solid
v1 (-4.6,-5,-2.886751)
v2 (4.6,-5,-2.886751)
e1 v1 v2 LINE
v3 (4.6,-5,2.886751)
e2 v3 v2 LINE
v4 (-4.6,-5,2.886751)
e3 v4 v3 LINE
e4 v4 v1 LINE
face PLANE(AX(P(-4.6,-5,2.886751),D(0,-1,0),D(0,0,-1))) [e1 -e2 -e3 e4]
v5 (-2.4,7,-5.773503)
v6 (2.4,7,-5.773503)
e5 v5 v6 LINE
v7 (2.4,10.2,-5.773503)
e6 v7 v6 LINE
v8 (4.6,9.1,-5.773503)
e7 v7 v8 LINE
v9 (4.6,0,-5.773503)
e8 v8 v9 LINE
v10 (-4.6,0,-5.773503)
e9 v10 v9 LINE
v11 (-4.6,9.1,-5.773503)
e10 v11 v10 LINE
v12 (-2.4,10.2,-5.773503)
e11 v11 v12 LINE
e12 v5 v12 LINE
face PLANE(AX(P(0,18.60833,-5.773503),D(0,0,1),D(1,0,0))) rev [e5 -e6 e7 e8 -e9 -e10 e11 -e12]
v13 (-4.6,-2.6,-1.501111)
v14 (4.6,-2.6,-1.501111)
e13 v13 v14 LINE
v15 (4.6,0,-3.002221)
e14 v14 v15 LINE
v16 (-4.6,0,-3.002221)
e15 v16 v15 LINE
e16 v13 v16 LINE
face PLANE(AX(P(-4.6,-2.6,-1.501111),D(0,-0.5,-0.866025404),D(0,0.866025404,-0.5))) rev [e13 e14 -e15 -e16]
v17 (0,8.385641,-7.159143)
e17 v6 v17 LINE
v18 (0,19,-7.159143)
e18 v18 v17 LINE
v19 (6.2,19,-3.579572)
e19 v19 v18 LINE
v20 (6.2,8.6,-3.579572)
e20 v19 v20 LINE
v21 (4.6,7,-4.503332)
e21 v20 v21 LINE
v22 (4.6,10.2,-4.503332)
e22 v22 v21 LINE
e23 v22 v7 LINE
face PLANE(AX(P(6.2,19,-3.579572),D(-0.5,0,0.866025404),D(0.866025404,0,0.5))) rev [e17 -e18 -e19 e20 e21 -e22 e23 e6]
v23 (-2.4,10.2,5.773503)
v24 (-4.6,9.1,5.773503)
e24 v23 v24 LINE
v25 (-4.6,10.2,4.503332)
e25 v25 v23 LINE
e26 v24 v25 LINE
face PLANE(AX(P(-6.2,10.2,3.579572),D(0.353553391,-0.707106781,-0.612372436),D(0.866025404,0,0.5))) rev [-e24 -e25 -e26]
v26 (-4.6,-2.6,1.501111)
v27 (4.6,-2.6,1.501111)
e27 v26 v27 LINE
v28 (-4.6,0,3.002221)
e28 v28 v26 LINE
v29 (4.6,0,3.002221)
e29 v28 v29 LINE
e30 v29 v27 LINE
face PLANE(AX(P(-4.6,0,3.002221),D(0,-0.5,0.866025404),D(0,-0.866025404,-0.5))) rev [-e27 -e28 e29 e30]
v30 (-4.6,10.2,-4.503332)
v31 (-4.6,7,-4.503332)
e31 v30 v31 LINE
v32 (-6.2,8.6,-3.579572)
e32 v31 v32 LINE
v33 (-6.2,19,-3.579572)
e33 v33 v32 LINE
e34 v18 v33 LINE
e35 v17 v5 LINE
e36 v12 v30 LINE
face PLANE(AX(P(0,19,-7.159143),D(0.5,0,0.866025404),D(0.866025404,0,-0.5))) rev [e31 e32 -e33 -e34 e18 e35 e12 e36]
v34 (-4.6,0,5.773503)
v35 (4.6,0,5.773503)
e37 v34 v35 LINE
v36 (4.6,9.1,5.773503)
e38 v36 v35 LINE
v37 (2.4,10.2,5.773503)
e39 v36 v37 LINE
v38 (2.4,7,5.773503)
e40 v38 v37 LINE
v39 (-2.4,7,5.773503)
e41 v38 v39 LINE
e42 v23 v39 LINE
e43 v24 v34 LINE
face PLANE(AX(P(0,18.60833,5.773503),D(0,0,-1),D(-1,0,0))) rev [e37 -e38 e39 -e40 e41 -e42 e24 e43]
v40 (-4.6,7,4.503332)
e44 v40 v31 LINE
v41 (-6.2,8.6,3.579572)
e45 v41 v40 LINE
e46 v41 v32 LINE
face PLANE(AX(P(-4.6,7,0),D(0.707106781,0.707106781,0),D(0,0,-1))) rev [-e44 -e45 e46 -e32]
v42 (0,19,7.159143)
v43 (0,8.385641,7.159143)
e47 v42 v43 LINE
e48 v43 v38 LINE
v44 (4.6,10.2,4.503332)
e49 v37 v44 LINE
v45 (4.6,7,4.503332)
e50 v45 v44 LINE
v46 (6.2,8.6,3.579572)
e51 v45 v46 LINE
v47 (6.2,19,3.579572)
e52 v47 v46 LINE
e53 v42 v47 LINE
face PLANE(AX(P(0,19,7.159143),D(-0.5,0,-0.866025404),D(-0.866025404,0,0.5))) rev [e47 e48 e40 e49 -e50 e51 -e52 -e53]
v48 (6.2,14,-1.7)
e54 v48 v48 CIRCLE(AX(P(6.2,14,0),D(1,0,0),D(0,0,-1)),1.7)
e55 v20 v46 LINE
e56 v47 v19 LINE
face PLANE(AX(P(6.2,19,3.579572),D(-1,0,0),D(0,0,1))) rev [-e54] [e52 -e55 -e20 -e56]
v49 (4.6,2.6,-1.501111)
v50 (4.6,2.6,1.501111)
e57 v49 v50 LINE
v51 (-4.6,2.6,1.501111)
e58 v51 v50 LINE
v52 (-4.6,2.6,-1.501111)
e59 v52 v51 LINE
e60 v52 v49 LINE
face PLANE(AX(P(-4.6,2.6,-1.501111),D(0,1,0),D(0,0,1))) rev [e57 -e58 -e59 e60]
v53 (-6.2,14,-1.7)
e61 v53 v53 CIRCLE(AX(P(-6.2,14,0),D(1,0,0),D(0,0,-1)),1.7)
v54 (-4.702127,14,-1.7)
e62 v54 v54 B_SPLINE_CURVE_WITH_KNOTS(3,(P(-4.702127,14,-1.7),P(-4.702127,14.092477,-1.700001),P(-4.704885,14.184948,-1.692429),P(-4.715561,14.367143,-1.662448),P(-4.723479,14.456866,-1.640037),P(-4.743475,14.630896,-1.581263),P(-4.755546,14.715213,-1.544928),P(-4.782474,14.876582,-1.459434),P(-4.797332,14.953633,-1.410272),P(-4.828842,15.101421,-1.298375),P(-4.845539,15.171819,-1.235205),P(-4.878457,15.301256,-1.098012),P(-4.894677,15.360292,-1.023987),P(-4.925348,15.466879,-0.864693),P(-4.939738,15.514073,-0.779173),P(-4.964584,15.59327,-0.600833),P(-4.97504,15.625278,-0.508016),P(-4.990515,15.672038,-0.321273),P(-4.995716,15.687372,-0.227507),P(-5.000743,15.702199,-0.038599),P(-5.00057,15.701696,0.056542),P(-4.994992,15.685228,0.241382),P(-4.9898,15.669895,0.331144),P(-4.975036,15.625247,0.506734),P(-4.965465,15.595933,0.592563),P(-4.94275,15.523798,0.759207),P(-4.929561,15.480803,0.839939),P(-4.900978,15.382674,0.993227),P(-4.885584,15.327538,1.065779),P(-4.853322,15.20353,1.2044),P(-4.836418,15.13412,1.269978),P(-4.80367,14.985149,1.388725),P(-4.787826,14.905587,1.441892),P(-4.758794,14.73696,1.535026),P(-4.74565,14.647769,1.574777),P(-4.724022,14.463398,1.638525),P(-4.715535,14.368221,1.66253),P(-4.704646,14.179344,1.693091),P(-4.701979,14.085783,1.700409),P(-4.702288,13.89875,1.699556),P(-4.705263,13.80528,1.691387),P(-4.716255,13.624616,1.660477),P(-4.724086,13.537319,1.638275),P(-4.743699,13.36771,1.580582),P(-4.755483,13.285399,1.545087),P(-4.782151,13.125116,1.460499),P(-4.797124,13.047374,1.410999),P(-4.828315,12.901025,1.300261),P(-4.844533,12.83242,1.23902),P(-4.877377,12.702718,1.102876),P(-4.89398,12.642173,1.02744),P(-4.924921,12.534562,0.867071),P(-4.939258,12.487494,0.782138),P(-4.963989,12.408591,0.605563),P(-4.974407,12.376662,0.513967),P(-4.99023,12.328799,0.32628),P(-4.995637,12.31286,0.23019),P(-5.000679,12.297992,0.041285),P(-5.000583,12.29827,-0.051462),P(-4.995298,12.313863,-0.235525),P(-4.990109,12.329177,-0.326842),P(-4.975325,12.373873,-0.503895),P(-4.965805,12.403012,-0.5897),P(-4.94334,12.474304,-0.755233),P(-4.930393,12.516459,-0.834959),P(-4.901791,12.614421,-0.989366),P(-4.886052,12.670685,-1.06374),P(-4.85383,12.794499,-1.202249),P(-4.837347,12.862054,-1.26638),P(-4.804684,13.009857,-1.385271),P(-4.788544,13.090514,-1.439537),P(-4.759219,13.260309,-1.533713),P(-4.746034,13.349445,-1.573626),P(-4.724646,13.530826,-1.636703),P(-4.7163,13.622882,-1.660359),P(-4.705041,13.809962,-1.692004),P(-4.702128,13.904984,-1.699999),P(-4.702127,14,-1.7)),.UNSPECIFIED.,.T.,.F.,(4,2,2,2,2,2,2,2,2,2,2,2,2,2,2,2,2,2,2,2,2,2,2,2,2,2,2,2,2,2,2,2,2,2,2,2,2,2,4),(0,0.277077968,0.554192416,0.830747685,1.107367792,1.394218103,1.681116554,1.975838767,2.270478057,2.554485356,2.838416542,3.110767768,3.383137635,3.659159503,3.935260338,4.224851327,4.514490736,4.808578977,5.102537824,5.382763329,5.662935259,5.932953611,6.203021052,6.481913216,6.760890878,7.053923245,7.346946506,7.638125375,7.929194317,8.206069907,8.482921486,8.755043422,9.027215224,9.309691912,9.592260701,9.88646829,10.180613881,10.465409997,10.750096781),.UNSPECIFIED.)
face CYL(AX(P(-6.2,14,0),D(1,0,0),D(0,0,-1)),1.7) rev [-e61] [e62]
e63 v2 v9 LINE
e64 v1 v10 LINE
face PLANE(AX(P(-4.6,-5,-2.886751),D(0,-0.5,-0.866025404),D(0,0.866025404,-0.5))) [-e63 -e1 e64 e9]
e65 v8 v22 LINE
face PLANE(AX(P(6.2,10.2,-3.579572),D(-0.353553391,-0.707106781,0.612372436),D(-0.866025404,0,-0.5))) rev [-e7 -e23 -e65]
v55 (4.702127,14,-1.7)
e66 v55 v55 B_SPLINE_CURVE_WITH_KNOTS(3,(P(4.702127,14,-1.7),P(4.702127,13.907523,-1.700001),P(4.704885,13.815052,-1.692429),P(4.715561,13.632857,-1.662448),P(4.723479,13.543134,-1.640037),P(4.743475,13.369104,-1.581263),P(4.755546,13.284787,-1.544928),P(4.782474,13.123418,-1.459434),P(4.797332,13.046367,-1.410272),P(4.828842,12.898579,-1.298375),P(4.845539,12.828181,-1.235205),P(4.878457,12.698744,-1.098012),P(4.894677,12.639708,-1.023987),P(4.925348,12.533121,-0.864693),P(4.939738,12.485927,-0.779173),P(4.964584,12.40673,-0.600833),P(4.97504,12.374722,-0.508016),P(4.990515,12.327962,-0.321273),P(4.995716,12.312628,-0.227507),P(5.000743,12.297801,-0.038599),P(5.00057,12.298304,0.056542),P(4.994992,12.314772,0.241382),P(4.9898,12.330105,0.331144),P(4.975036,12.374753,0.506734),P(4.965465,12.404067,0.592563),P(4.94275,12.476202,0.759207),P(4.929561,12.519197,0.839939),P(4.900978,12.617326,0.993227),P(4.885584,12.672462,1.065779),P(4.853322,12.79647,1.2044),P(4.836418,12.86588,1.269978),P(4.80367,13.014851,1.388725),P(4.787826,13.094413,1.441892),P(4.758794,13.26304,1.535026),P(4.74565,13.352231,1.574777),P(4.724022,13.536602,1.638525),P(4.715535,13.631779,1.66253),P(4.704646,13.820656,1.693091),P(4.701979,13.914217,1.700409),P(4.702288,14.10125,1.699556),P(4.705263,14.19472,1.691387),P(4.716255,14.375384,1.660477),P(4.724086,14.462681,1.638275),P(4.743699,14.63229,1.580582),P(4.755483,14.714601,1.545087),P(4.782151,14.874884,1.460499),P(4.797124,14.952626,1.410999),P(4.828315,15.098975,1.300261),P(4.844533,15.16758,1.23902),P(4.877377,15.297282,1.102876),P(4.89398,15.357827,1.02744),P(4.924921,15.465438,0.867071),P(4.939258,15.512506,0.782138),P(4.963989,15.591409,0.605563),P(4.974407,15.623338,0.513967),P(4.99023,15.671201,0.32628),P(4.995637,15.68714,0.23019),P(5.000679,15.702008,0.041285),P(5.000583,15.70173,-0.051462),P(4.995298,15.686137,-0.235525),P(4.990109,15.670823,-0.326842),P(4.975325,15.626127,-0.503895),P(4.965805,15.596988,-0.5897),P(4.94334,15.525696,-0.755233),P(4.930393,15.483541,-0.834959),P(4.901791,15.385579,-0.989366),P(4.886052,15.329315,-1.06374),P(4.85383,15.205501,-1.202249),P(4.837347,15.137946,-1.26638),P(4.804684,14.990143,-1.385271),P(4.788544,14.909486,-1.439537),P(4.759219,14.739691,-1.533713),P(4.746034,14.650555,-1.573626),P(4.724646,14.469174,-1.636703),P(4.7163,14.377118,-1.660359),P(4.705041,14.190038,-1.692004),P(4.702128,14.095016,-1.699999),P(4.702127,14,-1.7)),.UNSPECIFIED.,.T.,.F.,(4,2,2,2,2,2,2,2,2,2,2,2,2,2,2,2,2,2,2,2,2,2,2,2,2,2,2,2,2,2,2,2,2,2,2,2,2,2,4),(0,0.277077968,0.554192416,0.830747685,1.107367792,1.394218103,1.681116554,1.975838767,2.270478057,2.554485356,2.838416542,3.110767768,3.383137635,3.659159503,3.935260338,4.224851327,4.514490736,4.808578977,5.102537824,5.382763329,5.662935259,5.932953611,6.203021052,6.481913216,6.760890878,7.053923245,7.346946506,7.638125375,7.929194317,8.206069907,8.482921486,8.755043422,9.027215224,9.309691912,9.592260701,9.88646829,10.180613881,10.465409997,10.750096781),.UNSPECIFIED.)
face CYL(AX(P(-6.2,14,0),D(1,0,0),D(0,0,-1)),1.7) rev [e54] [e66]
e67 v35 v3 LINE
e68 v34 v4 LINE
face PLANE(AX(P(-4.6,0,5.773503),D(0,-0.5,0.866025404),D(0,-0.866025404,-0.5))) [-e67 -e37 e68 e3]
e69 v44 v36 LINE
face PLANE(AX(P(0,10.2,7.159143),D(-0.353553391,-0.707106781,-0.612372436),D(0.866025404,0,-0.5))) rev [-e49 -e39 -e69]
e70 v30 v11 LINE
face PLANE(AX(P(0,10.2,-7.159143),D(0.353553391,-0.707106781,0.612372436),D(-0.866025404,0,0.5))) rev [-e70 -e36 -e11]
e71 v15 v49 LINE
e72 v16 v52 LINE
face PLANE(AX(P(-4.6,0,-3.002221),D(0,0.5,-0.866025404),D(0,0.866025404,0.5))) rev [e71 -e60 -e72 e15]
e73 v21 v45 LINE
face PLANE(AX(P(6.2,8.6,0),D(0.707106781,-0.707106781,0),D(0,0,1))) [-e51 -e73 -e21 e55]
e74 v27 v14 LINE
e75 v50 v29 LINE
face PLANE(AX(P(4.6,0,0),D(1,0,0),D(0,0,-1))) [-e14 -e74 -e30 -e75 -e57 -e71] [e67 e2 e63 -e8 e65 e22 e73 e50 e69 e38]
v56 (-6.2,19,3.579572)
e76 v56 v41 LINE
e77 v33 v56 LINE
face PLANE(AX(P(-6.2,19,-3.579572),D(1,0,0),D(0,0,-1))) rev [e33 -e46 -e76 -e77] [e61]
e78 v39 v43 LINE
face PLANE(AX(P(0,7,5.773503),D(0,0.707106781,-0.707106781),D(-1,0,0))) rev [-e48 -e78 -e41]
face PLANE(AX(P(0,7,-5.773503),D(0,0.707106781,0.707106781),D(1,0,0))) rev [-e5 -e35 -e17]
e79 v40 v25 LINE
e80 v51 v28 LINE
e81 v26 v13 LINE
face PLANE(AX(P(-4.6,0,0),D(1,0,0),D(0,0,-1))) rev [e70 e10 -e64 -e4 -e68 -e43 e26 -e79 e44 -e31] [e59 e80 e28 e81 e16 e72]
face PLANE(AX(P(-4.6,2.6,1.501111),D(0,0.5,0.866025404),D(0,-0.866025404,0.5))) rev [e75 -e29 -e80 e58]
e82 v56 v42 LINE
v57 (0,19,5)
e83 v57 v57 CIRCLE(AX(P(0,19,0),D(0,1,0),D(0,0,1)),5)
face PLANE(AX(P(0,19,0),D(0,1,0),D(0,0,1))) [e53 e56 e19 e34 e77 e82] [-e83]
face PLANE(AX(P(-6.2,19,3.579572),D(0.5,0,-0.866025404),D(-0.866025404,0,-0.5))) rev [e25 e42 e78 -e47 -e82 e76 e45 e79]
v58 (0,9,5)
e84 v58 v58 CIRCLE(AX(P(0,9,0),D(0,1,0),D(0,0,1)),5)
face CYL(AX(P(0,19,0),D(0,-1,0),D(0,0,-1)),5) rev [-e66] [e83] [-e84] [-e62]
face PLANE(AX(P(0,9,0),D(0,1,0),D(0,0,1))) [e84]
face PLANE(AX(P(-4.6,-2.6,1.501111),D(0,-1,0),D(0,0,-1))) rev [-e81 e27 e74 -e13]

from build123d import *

# Parameters (mm, degrees)
SALIENTE_EXTRUIR1_DEPTH      = 4.6
SALIENTE_EXTRUIR1_DEPTH_BACK = 4.6
SALIENTE_EXTRUIR2_START      = 4
CROQUIS2_R                   = 5
SALIENTE_EXTRUIR2_DEPTH      = 10
CROQUIS4_W                   = 9.2
CROQUIS4_H                   = 2.771281292
SALIENTE_EXTRUIR3_DEPTH      = 9
SALIENTE_EXTRUIR4_START      = 2.6
CROQUIS4_3_W                 = 9.2
CROQUIS4_3_H                 = 6.0044428
SALIENTE_EXTRUIR4_DEPTH      = 6.4
SALIENTE_EXTRUIR5_START      = 3.6
CROQUIS2_2_R                 = 5
SALIENTE_EXTRUIR5_DEPTH      = 0.4
CHAFL_N1_SIZE                = 1.2
CHAFL_N2_SIZE                = 1.6
CROQUIS5_R                   = 1.7
CORTAR_EXTRUIR1_DEPTH        = 24.791034726


with BuildPart() as part:
    # Croquis1 → Saliente-Extruir1 (new, two sides: drawn at the far end of the back side and taken through both)
    with BuildSketch(Plane(origin=(0, 0, 0), x_dir=(0, 0, -1), z_dir=(1, 0, 0)).offset(-SALIENTE_EXTRUIR1_DEPTH_BACK)):
        Polygon((2.886751346, 5), (-2.886751346, 5), (-5.773502692, 0), (-2.886751346, -5), (2.886751346, -5), (5.773502692, 0), align=None)
        Polygon((3.0022214, 0), (1.5011107, 2.6), (-1.5011107, 2.6), (-3.0022214, 0), (-1.5011107, -2.6), (1.5011107, -2.6), align=None, mode=Mode.SUBTRACT)
    extrude(amount=SALIENTE_EXTRUIR1_DEPTH + SALIENTE_EXTRUIR1_DEPTH_BACK)



with BuildPart() as body_2:
    # Croquis2 → Saliente-Extruir2 (new body)
    with BuildSketch(Plane(origin=(0, 5, 0), x_dir=(1, 0, 0), z_dir=(0, 1, 0)).offset(SALIENTE_EXTRUIR2_START)):
        Polygon((0, 7.159143338), (-6.2, 3.579571669), (-6.2, -3.579571669), (0, -7.159143338), (6.2, -3.579571669), (6.2, 3.579571669), align=None)
        with Locations(Location((0, 0, 0), (0, 0, 270))):
            Circle(CROQUIS2_R, mode=Mode.SUBTRACT)
    extrude(amount=SALIENTE_EXTRUIR2_DEPTH)


with BuildPart() as part_1:
    add(part.part)

    add(body_2.part)  # Saliente-Extruir3 merges body 2
    # Croquis4 → Saliente-Extruir3 (add)
    with BuildSketch(Plane(origin=(0, 0, 0), x_dir=(1, 0, 0), z_dir=(0, 1, 0))):
        with Locations((0, -4.387862046)):
            Rectangle(CROQUIS4_W, CROQUIS4_H)
        with Locations((0, 4.387862046)):
            Rectangle(CROQUIS4_W, CROQUIS4_H)
    extrude(amount=SALIENTE_EXTRUIR3_DEPTH)

    # Croquis4<3> → Saliente-Extruir4 (add)
    with BuildSketch(Plane(origin=(0, 0, 0), x_dir=(1, 0, 0), z_dir=(0, 1, 0)).offset(SALIENTE_EXTRUIR4_START)):
        Rectangle(CROQUIS4_3_W, CROQUIS4_3_H)
    extrude(amount=SALIENTE_EXTRUIR4_DEPTH)

    # Croquis2<2> → Saliente-Extruir5 (add)
    # profile 1 of 2: a face of its own
    with BuildSketch(Plane(origin=(0, 5, 0), x_dir=(1, 0, 0), z_dir=(0, 1, 0)).offset(SALIENTE_EXTRUIR5_START)):
        Polygon((6.2, -3.579571669), (6.2, 3.579571669), (0, 7.159143338), (-6.2, 3.579571669), (-6.2, -3.579571669), (0, -7.159143338), align=None)
        with Locations(Location((0, 0, 0), (0, 0, 270))):
            Circle(CROQUIS2_2_R, mode=Mode.SUBTRACT)
    # profile 2 of 2: a face of its own
    with BuildSketch(Plane(origin=(0, 5, 0), x_dir=(1, 0, 0), z_dir=(0, 1, 0)).offset(SALIENTE_EXTRUIR5_START)):
        with Locations(Location((0, 0, 0), (0, 0, 270))):
            Circle(CROQUIS2_2_R)
    extrude(amount=SALIENTE_EXTRUIR5_DEPTH)

    # Chaflán1
    # the kernel refuses this chamfer: 1.2 mm, written as the material it adds along each edge
    with BuildSketch(Plane(origin=(-0.272571358, 9, 7.316512485), x_dir=(0.49981095845564805, -0.027495876610585935, 0.8656979742248805), z_dir=(0.8660254037844388, 0, -0.49999999999999967))) as chafl_n1_piece_1_section:
        Polygon((CHAFL_N1_SIZE * 0.999621916911, -CHAFL_N1_SIZE * 0.0274958766106), (-CHAFL_N1_SIZE * 0.0274958766106, -CHAFL_N1_SIZE * 0.999621916911), (0, 0), align=None)
    chafl_n1_piece_1 = extrude(amount=8.712380356, mode=Mode.PRIVATE)
    chafl_n1_piece_1 = split(chafl_n1_piece_1, bisect_by=Plane(origin=(4.6, 9.457, 5.303539573), z_dir=(-1, 0, 0)), keep=Keep.TOP, mode=Mode.PRIVATE)
    chafl_n1_piece_1 = split(chafl_n1_piece_1, bisect_by=Plane(origin=(3.786, 9.457, 5.773502692), z_dir=(0, 0, -1)), keep=Keep.TOP, mode=Mode.PRIVATE)
    add(chafl_n1_piece_1)
    with BuildSketch(Plane(origin=(-7.272571358, 9, 2.960322307), x_dir=(-0.4998109584556484, -0.027495876610585918, 0.8656979742248802), z_dir=(0.8660254037844387, 0, 0.5000000000000001))) as chafl_n1_piece_2_section:
        Polygon((CHAFL_N1_SIZE * 0.999621916911, -CHAFL_N1_SIZE * 0.0274958766106), (-CHAFL_N1_SIZE * 0.0274958766106, -CHAFL_N1_SIZE * 0.999621916911), (0, 0), align=None)
    chafl_n1_piece_2 = extrude(amount=8.712380356, mode=Mode.PRIVATE)
    chafl_n1_piece_2 = split(chafl_n1_piece_2, bisect_by=Plane(origin=(-4.6, 9.457, 5.303539573), z_dir=(1, 0, 0)), keep=Keep.TOP, mode=Mode.PRIVATE)
    chafl_n1_piece_2 = split(chafl_n1_piece_2, bisect_by=Plane(origin=(-3.786, 9.457, 5.773502692), z_dir=(0, 0, -1)), keep=Keep.TOP, mode=Mode.PRIVATE)
    add(chafl_n1_piece_2)
    with BuildSketch(Plane(origin=(0.272571358, 9, -7.316512485), x_dir=(-0.49981095845564827, -0.027495876610585914, -0.8656979742248804), z_dir=(-0.8660254037844387, 0, 0.49999999999999994))) as chafl_n1_piece_3_section:
        Polygon((CHAFL_N1_SIZE * 0.999621916911, -CHAFL_N1_SIZE * 0.0274958766106), (-CHAFL_N1_SIZE * 0.0274958766106, -CHAFL_N1_SIZE * 0.999621916911), (0, 0), align=None)
    chafl_n1_piece_3 = extrude(amount=8.712380356, mode=Mode.PRIVATE)
    chafl_n1_piece_3 = split(chafl_n1_piece_3, bisect_by=Plane(origin=(-4.6, 9.457, -5.303539573), z_dir=(1, 0, 0)), keep=Keep.TOP, mode=Mode.PRIVATE)
    chafl_n1_piece_3 = split(chafl_n1_piece_3, bisect_by=Plane(origin=(-3.786, 9.457, -5.773502692), z_dir=(0, 0, 1)), keep=Keep.TOP, mode=Mode.PRIVATE)
    add(chafl_n1_piece_3)
    with BuildSketch(Plane(origin=(7.272571358, 9, -2.960322307), x_dir=(-0.013747938305293247, 0.9996219169112968, 0.023812127644090377), z_dir=(-0.8660254037844387, 0, -0.5000000000000001))) as chafl_n1_piece_4_section:
        Polygon((CHAFL_N1_SIZE * 0.999621916911, CHAFL_N1_SIZE * 0.0274958766106), (-CHAFL_N1_SIZE * 0.0274958766106, CHAFL_N1_SIZE * 0.999621916911), (0, 0), align=None)
    chafl_n1_piece_4 = extrude(amount=8.712380356, mode=Mode.PRIVATE)
    chafl_n1_piece_4 = split(chafl_n1_piece_4, bisect_by=Plane(origin=(4.6, 9.457, -5.303539573), z_dir=(-1, 0, 0)), keep=Keep.TOP, mode=Mode.PRIVATE)
    chafl_n1_piece_4 = split(chafl_n1_piece_4, bisect_by=Plane(origin=(3.786, 9.457, -5.773502692), z_dir=(0, 0, 1)), keep=Keep.TOP, mode=Mode.PRIVATE)
    add(chafl_n1_piece_4)

    # Chaflán2
    # the kernel refuses this chamfer: 1.6 mm, written as the material it adds along each edge
    with BuildSketch(Plane(origin=(4.6, 8.6, -8.61802488), x_dir=(0.9996219169112968, 0.027495876610586285, 0), z_dir=(0, 0, 1))) as chafl_n2_piece_1_section:
        Polygon((CHAFL_N2_SIZE * 0.999621916911, -CHAFL_N2_SIZE * 0.0274958766106), (-CHAFL_N2_SIZE * 0.0274958766106, -CHAFL_N2_SIZE * 0.999621916911), (0, 0), align=None)
    chafl_n2_piece_1 = extrude(amount=17.236049761, mode=Mode.PRIVATE)
    chafl_n2_piece_1 = split(chafl_n2_piece_1, bisect_by=Plane(origin=(6.927780638, 8.059532411, -3.159387322), z_dir=(-0.5000000000000001, 0, 0.8660254037844387)), keep=Keep.TOP, mode=Mode.PRIVATE)
    chafl_n2_piece_1 = split(chafl_n2_piece_1, bisect_by=Plane(origin=(6.927780638, 8.059532411, 3.159387322), z_dir=(-0.49999999999999967, 0, -0.8660254037844388)), keep=Keep.TOP, mode=Mode.PRIVATE)
    chafl_n2_piece_1 = split(chafl_n2_piece_1, bisect_by=Plane(origin=(6.2, 8.059532411, 0), z_dir=(-1, 0, 0)), keep=Keep.TOP, mode=Mode.PRIVATE)
    add(chafl_n2_piece_1)
    with BuildSketch(Plane(origin=(-6.514692781, 8.6, -5.773502692), x_dir=(0, 0.027495876610586265, -0.9996219169112966), z_dir=(1, 0, 0))) as chafl_n2_piece_2_section:
        Polygon((CHAFL_N2_SIZE * 0.999621916911, -CHAFL_N2_SIZE * 0.0274958766106), (-CHAFL_N2_SIZE * 0.0274958766106, -CHAFL_N2_SIZE * 0.999621916911), (0, 0), align=None)
    chafl_n2_piece_2 = extrude(amount=13.029385561, mode=Mode.PRIVATE)
    chafl_n2_piece_2 = split(chafl_n2_piece_2, bisect_by=Plane(origin=(0.451958261, 7.972982249, -6.898205114), z_dir=(-0.5000000000000001, 0, 0.8660254037844387)), keep=Keep.TOP, mode=Mode.PRIVATE)
    chafl_n2_piece_2 = split(chafl_n2_piece_2, bisect_by=Plane(origin=(-0.451958261, 7.972982249, -6.898205114), z_dir=(0.49999999999999994, 0, 0.8660254037844387)), keep=Keep.TOP, mode=Mode.PRIVATE)
    add(chafl_n2_piece_2)
    with BuildSketch(Plane(origin=(-4.6, 8.6, -8.61802488), x_dir=(0.027495876610586285, -0.9996219169112968, 0), z_dir=(0, 0, 1))) as chafl_n2_piece_3_section:
        Polygon((CHAFL_N2_SIZE * 0.999621916911, -CHAFL_N2_SIZE * 0.0274958766106), (-CHAFL_N2_SIZE * 0.0274958766106, -CHAFL_N2_SIZE * 0.999621916911), (0, 0), align=None)
    chafl_n2_piece_3 = extrude(amount=17.236049761, mode=Mode.PRIVATE)
    chafl_n2_piece_3 = split(chafl_n2_piece_3, bisect_by=Plane(origin=(-6.927780638, 8.059532411, -3.159387322), z_dir=(0.49999999999999994, 0, 0.8660254037844387)), keep=Keep.TOP, mode=Mode.PRIVATE)
    chafl_n2_piece_3 = split(chafl_n2_piece_3, bisect_by=Plane(origin=(-6.927780638, 8.059532411, 3.159387322), z_dir=(0.5000000000000001, 0, -0.8660254037844387)), keep=Keep.TOP, mode=Mode.PRIVATE)
    chafl_n2_piece_3 = split(chafl_n2_piece_3, bisect_by=Plane(origin=(-6.2, 8.059532411, 0), z_dir=(1, 0, 0)), keep=Keep.TOP, mode=Mode.PRIVATE)
    add(chafl_n2_piece_3)
    with BuildSketch(Plane(origin=(-6.514692781, 8.6, 5.773502692), x_dir=(0, 0.027495876610586265, 0.9996219169112966), z_dir=(1, 0, 0))) as chafl_n2_piece_4_section:
        Polygon((CHAFL_N2_SIZE * 0.999621916911, CHAFL_N2_SIZE * 0.0274958766106), (-CHAFL_N2_SIZE * 0.0274958766106, CHAFL_N2_SIZE * 0.999621916911), (0, 0), align=None)
    chafl_n2_piece_4 = extrude(amount=13.029385561, mode=Mode.PRIVATE)
    chafl_n2_piece_4 = split(chafl_n2_piece_4, bisect_by=Plane(origin=(0.451958261, 7.972982249, 6.898205114), z_dir=(-0.49999999999999967, 0, -0.8660254037844388)), keep=Keep.TOP, mode=Mode.PRIVATE)
    chafl_n2_piece_4 = split(chafl_n2_piece_4, bisect_by=Plane(origin=(-0.451958261, 7.972982249, 6.898205114), z_dir=(0.5000000000000001, 0, -0.8660254037844387)), keep=Keep.TOP, mode=Mode.PRIVATE)
    add(chafl_n2_piece_4)

    # Croquis5 → Cortar-Extruir1 (cut, through all)
    with BuildSketch(Plane(origin=(6.2, 0, 0), x_dir=(0, 0, -1), z_dir=(1, 0, 0))):
        with Locations((0, 14)):
            Circle(CROQUIS5_R)
    extrude(amount=-CORTAR_EXTRUIR1_DEPTH, mode=Mode.SUBTRACT)


solid = part_1.part
